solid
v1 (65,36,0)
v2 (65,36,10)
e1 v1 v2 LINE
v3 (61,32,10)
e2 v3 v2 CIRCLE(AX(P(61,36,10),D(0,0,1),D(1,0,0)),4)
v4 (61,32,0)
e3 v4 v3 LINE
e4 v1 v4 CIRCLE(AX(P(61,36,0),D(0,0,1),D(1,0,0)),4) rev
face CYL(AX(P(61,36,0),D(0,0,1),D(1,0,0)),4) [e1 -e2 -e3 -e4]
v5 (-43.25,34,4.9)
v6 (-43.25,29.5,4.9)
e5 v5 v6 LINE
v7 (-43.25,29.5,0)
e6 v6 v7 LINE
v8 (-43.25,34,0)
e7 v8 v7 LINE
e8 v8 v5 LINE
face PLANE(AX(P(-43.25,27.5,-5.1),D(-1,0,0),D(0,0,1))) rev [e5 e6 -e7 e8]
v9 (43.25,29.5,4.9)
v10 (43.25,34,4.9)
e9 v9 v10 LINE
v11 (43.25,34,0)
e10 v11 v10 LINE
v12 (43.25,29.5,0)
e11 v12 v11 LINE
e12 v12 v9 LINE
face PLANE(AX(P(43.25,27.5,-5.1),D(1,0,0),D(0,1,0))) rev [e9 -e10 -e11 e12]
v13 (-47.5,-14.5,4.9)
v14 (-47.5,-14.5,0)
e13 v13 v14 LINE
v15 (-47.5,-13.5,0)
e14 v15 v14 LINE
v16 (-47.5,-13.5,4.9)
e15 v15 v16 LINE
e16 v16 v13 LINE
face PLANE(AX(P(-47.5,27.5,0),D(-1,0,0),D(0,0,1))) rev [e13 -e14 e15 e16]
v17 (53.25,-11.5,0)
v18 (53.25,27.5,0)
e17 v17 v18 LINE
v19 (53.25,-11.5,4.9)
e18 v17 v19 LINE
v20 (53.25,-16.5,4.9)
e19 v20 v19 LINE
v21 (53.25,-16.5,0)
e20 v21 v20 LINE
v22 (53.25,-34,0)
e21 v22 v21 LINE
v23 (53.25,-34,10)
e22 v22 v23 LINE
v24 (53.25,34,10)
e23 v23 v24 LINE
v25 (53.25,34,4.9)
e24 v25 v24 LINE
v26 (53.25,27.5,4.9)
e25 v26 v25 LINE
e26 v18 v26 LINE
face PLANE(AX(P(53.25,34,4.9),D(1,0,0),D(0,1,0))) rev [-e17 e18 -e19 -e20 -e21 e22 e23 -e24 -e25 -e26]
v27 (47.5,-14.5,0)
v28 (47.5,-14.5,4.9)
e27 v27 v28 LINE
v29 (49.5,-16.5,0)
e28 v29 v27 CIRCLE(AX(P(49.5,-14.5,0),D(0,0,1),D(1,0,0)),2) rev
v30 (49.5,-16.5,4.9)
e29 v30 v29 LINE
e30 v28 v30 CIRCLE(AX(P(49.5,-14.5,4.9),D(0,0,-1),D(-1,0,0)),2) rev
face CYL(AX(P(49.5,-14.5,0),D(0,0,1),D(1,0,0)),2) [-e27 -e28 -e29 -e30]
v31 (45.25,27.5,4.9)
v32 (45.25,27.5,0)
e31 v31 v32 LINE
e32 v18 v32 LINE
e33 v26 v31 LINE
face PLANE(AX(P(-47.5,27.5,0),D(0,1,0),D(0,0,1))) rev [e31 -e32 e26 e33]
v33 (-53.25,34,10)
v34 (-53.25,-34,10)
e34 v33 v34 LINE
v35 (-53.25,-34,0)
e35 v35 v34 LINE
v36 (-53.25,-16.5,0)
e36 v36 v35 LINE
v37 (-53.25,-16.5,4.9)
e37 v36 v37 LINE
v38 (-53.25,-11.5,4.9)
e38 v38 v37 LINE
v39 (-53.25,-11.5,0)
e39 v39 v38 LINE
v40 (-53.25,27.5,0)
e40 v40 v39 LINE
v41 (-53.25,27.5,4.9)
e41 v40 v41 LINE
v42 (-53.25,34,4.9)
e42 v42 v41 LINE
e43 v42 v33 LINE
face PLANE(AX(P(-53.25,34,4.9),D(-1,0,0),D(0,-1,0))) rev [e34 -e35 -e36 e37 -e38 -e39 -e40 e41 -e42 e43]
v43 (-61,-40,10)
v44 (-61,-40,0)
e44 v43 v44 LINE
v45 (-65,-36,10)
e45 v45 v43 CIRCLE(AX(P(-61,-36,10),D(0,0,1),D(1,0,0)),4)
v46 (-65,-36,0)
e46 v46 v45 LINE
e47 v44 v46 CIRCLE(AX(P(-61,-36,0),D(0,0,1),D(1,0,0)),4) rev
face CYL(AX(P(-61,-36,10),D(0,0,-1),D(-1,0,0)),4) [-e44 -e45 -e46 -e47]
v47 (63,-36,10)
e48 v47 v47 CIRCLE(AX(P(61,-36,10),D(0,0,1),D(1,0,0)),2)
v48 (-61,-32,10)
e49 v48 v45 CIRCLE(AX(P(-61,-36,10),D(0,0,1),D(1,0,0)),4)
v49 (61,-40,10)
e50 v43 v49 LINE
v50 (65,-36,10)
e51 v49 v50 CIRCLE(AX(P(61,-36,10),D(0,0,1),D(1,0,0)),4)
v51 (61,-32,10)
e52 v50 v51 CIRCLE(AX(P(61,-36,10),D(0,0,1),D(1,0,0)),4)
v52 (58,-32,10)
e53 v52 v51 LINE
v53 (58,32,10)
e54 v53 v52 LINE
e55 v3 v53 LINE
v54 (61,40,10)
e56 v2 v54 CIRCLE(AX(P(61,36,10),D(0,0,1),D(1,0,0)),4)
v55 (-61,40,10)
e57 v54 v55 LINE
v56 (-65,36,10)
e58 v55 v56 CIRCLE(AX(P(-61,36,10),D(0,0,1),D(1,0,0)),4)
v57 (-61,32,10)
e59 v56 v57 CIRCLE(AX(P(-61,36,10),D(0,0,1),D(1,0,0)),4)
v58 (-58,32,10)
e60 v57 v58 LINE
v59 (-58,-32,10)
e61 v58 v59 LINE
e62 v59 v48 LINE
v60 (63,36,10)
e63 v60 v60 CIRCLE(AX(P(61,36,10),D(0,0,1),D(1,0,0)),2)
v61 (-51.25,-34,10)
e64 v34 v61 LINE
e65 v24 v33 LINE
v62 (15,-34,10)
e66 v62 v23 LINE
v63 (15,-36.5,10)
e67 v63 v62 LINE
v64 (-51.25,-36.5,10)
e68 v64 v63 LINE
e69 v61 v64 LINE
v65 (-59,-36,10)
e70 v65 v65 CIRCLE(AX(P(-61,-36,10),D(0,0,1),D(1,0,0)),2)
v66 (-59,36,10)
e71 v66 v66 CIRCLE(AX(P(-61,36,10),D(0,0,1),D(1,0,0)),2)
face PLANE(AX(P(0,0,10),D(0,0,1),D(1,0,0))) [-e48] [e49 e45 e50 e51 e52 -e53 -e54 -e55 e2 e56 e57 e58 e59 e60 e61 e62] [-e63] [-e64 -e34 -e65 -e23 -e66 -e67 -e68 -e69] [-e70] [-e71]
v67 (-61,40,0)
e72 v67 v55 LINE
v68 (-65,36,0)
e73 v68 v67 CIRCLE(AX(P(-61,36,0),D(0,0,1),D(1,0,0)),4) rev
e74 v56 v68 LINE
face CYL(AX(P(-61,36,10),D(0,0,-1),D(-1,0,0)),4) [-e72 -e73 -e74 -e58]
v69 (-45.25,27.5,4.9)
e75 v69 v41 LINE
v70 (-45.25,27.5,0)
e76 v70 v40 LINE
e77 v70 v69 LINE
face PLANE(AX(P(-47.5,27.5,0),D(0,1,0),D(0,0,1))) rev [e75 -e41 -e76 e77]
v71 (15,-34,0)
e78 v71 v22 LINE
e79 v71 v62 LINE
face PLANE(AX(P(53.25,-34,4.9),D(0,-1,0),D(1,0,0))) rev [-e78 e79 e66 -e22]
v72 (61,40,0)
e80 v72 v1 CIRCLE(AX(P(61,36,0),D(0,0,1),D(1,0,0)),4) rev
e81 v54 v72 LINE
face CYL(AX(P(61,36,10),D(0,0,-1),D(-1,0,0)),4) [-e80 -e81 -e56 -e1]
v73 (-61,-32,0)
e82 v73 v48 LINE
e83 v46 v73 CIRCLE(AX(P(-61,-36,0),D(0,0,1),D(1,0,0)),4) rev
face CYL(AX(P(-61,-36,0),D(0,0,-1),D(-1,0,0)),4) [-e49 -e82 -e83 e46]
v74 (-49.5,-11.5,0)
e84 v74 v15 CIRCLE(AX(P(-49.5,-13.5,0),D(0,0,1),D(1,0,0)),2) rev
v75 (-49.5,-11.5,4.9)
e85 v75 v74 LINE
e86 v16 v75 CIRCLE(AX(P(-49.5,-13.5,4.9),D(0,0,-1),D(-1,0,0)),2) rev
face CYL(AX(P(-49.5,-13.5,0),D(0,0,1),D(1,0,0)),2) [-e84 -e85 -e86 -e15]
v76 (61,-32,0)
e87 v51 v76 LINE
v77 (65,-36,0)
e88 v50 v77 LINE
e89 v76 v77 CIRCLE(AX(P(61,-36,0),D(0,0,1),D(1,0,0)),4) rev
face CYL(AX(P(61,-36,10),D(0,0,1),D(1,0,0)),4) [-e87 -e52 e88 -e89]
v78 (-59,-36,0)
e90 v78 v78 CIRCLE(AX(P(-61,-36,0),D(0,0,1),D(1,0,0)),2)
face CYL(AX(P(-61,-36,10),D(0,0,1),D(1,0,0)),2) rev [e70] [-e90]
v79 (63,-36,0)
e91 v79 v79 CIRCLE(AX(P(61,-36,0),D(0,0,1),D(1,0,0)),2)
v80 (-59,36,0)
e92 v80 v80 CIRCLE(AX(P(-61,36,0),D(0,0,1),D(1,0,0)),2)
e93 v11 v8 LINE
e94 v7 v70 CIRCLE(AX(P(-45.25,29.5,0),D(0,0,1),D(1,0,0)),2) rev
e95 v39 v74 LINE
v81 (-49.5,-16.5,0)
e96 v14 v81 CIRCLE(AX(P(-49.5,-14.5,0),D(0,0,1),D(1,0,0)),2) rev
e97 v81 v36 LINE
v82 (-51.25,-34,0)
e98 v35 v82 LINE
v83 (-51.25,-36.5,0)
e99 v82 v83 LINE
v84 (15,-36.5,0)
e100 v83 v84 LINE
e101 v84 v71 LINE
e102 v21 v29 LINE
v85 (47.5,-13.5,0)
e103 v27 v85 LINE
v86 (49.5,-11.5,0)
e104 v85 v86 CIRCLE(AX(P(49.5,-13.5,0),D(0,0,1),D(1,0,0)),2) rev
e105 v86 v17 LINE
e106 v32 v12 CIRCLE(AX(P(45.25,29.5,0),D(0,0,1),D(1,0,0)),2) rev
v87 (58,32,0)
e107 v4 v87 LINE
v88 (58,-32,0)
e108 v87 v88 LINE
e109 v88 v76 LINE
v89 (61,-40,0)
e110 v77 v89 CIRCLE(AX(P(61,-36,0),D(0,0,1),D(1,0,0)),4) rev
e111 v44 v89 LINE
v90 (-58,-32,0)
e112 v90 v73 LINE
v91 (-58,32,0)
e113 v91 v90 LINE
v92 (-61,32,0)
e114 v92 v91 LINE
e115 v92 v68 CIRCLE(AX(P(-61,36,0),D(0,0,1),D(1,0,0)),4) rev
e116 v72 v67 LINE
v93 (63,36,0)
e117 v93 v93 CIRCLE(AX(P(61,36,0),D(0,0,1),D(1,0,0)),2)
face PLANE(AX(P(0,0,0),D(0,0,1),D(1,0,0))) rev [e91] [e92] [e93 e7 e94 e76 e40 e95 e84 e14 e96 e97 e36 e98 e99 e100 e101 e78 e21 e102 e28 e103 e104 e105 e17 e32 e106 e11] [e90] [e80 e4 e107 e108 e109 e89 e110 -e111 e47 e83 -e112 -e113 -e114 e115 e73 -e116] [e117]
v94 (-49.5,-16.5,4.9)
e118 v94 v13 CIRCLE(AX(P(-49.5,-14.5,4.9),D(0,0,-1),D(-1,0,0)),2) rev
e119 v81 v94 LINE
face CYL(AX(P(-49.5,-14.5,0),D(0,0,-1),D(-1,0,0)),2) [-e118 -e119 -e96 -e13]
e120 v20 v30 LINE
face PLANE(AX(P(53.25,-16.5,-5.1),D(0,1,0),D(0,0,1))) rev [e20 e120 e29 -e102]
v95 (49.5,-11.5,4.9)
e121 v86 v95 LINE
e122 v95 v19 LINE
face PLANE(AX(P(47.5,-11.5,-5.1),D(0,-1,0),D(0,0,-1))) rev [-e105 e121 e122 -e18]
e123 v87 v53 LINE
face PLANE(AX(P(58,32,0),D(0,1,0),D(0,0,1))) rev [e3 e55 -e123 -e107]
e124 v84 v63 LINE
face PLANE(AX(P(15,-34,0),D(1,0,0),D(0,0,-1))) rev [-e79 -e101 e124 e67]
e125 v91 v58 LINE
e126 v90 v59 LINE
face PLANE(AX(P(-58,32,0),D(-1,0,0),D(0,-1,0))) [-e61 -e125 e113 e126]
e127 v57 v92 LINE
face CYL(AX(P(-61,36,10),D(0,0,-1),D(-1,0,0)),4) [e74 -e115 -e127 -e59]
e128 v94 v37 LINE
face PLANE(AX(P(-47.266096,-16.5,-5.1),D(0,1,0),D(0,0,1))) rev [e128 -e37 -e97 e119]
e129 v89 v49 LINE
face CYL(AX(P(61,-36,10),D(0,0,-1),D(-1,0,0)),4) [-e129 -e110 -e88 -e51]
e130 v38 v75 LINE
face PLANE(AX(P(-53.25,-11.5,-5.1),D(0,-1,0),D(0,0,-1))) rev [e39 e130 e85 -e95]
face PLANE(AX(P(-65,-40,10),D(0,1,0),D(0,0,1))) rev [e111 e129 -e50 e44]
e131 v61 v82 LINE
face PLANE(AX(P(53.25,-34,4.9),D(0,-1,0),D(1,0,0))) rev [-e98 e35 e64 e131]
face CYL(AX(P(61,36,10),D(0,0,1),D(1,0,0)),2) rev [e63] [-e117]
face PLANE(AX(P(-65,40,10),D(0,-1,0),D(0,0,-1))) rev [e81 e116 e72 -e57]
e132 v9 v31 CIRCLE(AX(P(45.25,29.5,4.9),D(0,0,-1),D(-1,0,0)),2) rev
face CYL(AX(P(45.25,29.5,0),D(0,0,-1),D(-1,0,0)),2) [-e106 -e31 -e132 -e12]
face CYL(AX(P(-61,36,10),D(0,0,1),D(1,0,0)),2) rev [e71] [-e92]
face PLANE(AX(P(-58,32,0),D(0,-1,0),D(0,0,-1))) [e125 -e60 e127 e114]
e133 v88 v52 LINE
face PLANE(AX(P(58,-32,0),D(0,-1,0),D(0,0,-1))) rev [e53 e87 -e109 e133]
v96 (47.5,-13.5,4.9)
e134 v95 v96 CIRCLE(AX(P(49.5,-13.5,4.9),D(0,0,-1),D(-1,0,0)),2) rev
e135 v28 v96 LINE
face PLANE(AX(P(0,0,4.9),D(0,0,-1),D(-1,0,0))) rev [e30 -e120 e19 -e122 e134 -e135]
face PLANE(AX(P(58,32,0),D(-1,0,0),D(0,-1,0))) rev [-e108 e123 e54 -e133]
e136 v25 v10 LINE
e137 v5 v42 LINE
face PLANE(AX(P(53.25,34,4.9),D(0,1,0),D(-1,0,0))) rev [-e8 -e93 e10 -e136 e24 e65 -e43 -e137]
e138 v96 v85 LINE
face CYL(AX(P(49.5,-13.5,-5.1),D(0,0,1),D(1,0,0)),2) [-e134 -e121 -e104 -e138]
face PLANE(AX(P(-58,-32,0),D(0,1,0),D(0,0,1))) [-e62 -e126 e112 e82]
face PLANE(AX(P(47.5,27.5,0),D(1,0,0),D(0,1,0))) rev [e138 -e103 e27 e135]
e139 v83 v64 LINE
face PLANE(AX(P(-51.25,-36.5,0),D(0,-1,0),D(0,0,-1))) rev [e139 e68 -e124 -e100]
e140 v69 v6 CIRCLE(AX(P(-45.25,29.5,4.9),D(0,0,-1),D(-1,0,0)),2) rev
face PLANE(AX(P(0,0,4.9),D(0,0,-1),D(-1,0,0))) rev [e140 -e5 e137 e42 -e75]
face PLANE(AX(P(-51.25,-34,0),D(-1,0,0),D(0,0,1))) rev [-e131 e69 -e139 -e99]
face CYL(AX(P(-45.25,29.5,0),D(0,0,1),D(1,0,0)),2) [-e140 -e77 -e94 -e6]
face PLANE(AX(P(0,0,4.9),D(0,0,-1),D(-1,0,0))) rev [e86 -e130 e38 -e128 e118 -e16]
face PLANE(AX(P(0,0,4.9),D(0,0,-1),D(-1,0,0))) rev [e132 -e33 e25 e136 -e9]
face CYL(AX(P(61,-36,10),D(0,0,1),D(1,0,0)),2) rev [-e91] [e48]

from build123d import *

# Parameters (mm, degrees)
SKETCH1_W             = 130
SKETCH1_H             = 80
BOSS_EXTRUDE1_DEPTH   = 10
FILLET1_R             = 4
F_4_0MM_DOWEL_HOLE1_D = 4
MIRROR2_COPY_1_D      = 4
SKETCH8_W             = 95
SKETCH8_H             = 55
CUT_EXTRUDE4_DEPTH    = 10
SKETCH4_W             = 106.5
SKETCH4_H             = 68
CUT_EXTRUDE1_DEPTH    = 5.1
SKETCH6_W             = 7
SKETCH6_H             = 64
CUT_EXTRUDE3_DEPTH    = 10
FILLET3_R             = 4
SKETCH10_W            = 66.25
SKETCH10_H            = 2.5
CUT_EXTRUDE6_DEPTH    = 10
SKETCH12_W            = 5.983903777
SKETCH12_H            = 17.5
SKETCH12_W_2          = 5.75
SKETCH12_H_2          = 39
CUT_EXTRUDE7_DEPTH    = 10
SKETCH13_W            = 86.5
SKETCH13_H            = 6.5
CUT_EXTRUDE8_DEPTH    = 10
SKETCH14_W            = 5.75
SKETCH14_H            = 39
CUT_EXTRUDE9_DEPTH    = 10
SKETCH15_W            = 5.75
SKETCH15_H            = 17.5
CUT_EXTRUDE10_DEPTH   = 10
SKETCH16_W            = 94.766096223
SKETCH16_H            = 6.5
CUT_EXTRUDE11_DEPTH   = 10
FILLET4_R             = 2


with BuildPart() as part:
    # Sketch1 → Boss-Extrude1 (new body)
    with BuildSketch(Plane.XY):
        Rectangle(SKETCH1_W, SKETCH1_H)
    extrude(amount=BOSS_EXTRUDE1_DEPTH)

    # Fillet1
    fillet1_edges = [part.edges().sort_by_distance(p)[0] for p in [
        (65, -40, 5),
        (-65, -40, 5),
        (-65, 40, 5),
        (65, 40, 5),
    ]]
    fillet(fillet1_edges, radius=FILLET1_R)

    # Ø4.0mm Dowel Hole1 (through all)
    with Locations(Plane.XY.offset(10)):
        with Locations((-61, 36)):
            f_4_0mm_dowel_hole1 = Hole(F_4_0MM_DOWEL_HOLE1_D / 2)

    # Mirror1: Ø4.0mm Dowel Hole1 across plane
    add(f_4_0mm_dowel_hole1.mirror(Plane(origin=(0, 0, 0), x_dir=(0, 0, 1), z_dir=(1, 0, 0))), mode=Mode.SUBTRACT)

    # Mirror2: Ø4.0mm Dowel Hole1 across plane
    add(f_4_0mm_dowel_hole1.mirror(Plane.ZX), mode=Mode.SUBTRACT)

    # Mirror2 copy 1 (through all)
    with Locations(Plane(origin=(0, 0, 10), x_dir=(-1, 0, 0), z_dir=(0, 0, 1))):
        with Locations((-61, 36)):
            Hole(MIRROR2_COPY_1_D / 2)

    # Sketch8 → Cut-Extrude4 (cut)
    with BuildSketch(Plane.XY.offset(10)):
        Rectangle(SKETCH8_W, SKETCH8_H)
    extrude(amount=-CUT_EXTRUDE4_DEPTH, mode=Mode.SUBTRACT)

    # Sketch4 → Cut-Extrude1 (cut)
    with BuildSketch(Plane.XY.offset(10)):
        Rectangle(SKETCH4_W, SKETCH4_H)
    extrude(amount=-CUT_EXTRUDE1_DEPTH, mode=Mode.SUBTRACT)

    # Sketch6 → Cut-Extrude3 (cut)
    with BuildSketch(Plane.XY.offset(10)):
        with Locations((61.5, 0)):
            Rectangle(SKETCH6_W, SKETCH6_H)
    cut_extrude3 = extrude(amount=-CUT_EXTRUDE3_DEPTH, mode=Mode.SUBTRACT)

    # Mirror6: Cut-Extrude3 across plane
    add(cut_extrude3.mirror(Plane(origin=(0, 0, 0), x_dir=(0, 0, 1), z_dir=(1, 0, 0))), mode=Mode.SUBTRACT)

    # Fillet3
    fillet3_edges = [part.edges().sort_by_distance(p)[0] for p in [
        (65, -32, 5),
        (65, 32, 5),
        (-65, -32, 5),
        (-65, 32, 5),
    ]]
    fillet(fillet3_edges, radius=FILLET3_R - 0.0001)  # a hair under: the kernel refuses the full size

    # Sketch10 → Cut-Extrude6 (cut)
    with BuildSketch(Plane.XY.offset(10)):
        with Locations((-18.125, -35.25)):
            Rectangle(SKETCH10_W, SKETCH10_H)
    extrude(amount=-CUT_EXTRUDE6_DEPTH, mode=Mode.SUBTRACT)

    # Sketch12 → Cut-Extrude7 (cut)
    with BuildSketch(Plane.XY.offset(4.9)):
        with Locations((-50.258048112, -25.25)):
            Rectangle(SKETCH12_W, SKETCH12_H)
        with Locations((-50.375, 8)):
            Rectangle(SKETCH12_W_2, SKETCH12_H_2)
    extrude(amount=-CUT_EXTRUDE7_DEPTH, mode=Mode.SUBTRACT)

    # Sketch13 → Cut-Extrude8 (cut)
    with BuildSketch(Plane.XY.offset(4.9)):
        with Locations((0, 30.75)):
            Rectangle(SKETCH13_W, SKETCH13_H)
    extrude(amount=-CUT_EXTRUDE8_DEPTH, mode=Mode.SUBTRACT)

    # Sketch14 → Cut-Extrude9 (cut)
    with BuildSketch(Plane.XY.offset(4.9)):
        with Locations((50.375, 8)):
            Rectangle(SKETCH14_W, SKETCH14_H)
    extrude(amount=-CUT_EXTRUDE9_DEPTH, mode=Mode.SUBTRACT)

    # Sketch15 → Cut-Extrude10 (cut)
    with BuildSketch(Plane.XY.offset(4.9)):
        with Locations((50.375, -25.25)):
            Rectangle(SKETCH15_W, SKETCH15_H)
    extrude(amount=-CUT_EXTRUDE10_DEPTH, mode=Mode.SUBTRACT)

    # Sketch16 → Cut-Extrude11 (cut)
    with BuildSketch(Plane.XY.offset(4.9)):
        with Locations((0.116951888, -30.75)):
            Rectangle(SKETCH16_W, SKETCH16_H)
    extrude(amount=-CUT_EXTRUDE11_DEPTH, mode=Mode.SUBTRACT)

    # Fillet4
    fillet4_edges = [part.edges().sort_by_distance(p)[0] for p in [
        (-47.5, -16.5, 2.45),
        (-47.5, -11.5, 2.45),
        (43.25, 27.5, 2.45),
        (-43.25, 27.5, 2.45),
        (47.5, -11.5, 2.45),
        (47.5, -16.5, 2.45),
    ]]
    fillet(fillet4_edges, radius=FILLET4_R)


solid = part.part
